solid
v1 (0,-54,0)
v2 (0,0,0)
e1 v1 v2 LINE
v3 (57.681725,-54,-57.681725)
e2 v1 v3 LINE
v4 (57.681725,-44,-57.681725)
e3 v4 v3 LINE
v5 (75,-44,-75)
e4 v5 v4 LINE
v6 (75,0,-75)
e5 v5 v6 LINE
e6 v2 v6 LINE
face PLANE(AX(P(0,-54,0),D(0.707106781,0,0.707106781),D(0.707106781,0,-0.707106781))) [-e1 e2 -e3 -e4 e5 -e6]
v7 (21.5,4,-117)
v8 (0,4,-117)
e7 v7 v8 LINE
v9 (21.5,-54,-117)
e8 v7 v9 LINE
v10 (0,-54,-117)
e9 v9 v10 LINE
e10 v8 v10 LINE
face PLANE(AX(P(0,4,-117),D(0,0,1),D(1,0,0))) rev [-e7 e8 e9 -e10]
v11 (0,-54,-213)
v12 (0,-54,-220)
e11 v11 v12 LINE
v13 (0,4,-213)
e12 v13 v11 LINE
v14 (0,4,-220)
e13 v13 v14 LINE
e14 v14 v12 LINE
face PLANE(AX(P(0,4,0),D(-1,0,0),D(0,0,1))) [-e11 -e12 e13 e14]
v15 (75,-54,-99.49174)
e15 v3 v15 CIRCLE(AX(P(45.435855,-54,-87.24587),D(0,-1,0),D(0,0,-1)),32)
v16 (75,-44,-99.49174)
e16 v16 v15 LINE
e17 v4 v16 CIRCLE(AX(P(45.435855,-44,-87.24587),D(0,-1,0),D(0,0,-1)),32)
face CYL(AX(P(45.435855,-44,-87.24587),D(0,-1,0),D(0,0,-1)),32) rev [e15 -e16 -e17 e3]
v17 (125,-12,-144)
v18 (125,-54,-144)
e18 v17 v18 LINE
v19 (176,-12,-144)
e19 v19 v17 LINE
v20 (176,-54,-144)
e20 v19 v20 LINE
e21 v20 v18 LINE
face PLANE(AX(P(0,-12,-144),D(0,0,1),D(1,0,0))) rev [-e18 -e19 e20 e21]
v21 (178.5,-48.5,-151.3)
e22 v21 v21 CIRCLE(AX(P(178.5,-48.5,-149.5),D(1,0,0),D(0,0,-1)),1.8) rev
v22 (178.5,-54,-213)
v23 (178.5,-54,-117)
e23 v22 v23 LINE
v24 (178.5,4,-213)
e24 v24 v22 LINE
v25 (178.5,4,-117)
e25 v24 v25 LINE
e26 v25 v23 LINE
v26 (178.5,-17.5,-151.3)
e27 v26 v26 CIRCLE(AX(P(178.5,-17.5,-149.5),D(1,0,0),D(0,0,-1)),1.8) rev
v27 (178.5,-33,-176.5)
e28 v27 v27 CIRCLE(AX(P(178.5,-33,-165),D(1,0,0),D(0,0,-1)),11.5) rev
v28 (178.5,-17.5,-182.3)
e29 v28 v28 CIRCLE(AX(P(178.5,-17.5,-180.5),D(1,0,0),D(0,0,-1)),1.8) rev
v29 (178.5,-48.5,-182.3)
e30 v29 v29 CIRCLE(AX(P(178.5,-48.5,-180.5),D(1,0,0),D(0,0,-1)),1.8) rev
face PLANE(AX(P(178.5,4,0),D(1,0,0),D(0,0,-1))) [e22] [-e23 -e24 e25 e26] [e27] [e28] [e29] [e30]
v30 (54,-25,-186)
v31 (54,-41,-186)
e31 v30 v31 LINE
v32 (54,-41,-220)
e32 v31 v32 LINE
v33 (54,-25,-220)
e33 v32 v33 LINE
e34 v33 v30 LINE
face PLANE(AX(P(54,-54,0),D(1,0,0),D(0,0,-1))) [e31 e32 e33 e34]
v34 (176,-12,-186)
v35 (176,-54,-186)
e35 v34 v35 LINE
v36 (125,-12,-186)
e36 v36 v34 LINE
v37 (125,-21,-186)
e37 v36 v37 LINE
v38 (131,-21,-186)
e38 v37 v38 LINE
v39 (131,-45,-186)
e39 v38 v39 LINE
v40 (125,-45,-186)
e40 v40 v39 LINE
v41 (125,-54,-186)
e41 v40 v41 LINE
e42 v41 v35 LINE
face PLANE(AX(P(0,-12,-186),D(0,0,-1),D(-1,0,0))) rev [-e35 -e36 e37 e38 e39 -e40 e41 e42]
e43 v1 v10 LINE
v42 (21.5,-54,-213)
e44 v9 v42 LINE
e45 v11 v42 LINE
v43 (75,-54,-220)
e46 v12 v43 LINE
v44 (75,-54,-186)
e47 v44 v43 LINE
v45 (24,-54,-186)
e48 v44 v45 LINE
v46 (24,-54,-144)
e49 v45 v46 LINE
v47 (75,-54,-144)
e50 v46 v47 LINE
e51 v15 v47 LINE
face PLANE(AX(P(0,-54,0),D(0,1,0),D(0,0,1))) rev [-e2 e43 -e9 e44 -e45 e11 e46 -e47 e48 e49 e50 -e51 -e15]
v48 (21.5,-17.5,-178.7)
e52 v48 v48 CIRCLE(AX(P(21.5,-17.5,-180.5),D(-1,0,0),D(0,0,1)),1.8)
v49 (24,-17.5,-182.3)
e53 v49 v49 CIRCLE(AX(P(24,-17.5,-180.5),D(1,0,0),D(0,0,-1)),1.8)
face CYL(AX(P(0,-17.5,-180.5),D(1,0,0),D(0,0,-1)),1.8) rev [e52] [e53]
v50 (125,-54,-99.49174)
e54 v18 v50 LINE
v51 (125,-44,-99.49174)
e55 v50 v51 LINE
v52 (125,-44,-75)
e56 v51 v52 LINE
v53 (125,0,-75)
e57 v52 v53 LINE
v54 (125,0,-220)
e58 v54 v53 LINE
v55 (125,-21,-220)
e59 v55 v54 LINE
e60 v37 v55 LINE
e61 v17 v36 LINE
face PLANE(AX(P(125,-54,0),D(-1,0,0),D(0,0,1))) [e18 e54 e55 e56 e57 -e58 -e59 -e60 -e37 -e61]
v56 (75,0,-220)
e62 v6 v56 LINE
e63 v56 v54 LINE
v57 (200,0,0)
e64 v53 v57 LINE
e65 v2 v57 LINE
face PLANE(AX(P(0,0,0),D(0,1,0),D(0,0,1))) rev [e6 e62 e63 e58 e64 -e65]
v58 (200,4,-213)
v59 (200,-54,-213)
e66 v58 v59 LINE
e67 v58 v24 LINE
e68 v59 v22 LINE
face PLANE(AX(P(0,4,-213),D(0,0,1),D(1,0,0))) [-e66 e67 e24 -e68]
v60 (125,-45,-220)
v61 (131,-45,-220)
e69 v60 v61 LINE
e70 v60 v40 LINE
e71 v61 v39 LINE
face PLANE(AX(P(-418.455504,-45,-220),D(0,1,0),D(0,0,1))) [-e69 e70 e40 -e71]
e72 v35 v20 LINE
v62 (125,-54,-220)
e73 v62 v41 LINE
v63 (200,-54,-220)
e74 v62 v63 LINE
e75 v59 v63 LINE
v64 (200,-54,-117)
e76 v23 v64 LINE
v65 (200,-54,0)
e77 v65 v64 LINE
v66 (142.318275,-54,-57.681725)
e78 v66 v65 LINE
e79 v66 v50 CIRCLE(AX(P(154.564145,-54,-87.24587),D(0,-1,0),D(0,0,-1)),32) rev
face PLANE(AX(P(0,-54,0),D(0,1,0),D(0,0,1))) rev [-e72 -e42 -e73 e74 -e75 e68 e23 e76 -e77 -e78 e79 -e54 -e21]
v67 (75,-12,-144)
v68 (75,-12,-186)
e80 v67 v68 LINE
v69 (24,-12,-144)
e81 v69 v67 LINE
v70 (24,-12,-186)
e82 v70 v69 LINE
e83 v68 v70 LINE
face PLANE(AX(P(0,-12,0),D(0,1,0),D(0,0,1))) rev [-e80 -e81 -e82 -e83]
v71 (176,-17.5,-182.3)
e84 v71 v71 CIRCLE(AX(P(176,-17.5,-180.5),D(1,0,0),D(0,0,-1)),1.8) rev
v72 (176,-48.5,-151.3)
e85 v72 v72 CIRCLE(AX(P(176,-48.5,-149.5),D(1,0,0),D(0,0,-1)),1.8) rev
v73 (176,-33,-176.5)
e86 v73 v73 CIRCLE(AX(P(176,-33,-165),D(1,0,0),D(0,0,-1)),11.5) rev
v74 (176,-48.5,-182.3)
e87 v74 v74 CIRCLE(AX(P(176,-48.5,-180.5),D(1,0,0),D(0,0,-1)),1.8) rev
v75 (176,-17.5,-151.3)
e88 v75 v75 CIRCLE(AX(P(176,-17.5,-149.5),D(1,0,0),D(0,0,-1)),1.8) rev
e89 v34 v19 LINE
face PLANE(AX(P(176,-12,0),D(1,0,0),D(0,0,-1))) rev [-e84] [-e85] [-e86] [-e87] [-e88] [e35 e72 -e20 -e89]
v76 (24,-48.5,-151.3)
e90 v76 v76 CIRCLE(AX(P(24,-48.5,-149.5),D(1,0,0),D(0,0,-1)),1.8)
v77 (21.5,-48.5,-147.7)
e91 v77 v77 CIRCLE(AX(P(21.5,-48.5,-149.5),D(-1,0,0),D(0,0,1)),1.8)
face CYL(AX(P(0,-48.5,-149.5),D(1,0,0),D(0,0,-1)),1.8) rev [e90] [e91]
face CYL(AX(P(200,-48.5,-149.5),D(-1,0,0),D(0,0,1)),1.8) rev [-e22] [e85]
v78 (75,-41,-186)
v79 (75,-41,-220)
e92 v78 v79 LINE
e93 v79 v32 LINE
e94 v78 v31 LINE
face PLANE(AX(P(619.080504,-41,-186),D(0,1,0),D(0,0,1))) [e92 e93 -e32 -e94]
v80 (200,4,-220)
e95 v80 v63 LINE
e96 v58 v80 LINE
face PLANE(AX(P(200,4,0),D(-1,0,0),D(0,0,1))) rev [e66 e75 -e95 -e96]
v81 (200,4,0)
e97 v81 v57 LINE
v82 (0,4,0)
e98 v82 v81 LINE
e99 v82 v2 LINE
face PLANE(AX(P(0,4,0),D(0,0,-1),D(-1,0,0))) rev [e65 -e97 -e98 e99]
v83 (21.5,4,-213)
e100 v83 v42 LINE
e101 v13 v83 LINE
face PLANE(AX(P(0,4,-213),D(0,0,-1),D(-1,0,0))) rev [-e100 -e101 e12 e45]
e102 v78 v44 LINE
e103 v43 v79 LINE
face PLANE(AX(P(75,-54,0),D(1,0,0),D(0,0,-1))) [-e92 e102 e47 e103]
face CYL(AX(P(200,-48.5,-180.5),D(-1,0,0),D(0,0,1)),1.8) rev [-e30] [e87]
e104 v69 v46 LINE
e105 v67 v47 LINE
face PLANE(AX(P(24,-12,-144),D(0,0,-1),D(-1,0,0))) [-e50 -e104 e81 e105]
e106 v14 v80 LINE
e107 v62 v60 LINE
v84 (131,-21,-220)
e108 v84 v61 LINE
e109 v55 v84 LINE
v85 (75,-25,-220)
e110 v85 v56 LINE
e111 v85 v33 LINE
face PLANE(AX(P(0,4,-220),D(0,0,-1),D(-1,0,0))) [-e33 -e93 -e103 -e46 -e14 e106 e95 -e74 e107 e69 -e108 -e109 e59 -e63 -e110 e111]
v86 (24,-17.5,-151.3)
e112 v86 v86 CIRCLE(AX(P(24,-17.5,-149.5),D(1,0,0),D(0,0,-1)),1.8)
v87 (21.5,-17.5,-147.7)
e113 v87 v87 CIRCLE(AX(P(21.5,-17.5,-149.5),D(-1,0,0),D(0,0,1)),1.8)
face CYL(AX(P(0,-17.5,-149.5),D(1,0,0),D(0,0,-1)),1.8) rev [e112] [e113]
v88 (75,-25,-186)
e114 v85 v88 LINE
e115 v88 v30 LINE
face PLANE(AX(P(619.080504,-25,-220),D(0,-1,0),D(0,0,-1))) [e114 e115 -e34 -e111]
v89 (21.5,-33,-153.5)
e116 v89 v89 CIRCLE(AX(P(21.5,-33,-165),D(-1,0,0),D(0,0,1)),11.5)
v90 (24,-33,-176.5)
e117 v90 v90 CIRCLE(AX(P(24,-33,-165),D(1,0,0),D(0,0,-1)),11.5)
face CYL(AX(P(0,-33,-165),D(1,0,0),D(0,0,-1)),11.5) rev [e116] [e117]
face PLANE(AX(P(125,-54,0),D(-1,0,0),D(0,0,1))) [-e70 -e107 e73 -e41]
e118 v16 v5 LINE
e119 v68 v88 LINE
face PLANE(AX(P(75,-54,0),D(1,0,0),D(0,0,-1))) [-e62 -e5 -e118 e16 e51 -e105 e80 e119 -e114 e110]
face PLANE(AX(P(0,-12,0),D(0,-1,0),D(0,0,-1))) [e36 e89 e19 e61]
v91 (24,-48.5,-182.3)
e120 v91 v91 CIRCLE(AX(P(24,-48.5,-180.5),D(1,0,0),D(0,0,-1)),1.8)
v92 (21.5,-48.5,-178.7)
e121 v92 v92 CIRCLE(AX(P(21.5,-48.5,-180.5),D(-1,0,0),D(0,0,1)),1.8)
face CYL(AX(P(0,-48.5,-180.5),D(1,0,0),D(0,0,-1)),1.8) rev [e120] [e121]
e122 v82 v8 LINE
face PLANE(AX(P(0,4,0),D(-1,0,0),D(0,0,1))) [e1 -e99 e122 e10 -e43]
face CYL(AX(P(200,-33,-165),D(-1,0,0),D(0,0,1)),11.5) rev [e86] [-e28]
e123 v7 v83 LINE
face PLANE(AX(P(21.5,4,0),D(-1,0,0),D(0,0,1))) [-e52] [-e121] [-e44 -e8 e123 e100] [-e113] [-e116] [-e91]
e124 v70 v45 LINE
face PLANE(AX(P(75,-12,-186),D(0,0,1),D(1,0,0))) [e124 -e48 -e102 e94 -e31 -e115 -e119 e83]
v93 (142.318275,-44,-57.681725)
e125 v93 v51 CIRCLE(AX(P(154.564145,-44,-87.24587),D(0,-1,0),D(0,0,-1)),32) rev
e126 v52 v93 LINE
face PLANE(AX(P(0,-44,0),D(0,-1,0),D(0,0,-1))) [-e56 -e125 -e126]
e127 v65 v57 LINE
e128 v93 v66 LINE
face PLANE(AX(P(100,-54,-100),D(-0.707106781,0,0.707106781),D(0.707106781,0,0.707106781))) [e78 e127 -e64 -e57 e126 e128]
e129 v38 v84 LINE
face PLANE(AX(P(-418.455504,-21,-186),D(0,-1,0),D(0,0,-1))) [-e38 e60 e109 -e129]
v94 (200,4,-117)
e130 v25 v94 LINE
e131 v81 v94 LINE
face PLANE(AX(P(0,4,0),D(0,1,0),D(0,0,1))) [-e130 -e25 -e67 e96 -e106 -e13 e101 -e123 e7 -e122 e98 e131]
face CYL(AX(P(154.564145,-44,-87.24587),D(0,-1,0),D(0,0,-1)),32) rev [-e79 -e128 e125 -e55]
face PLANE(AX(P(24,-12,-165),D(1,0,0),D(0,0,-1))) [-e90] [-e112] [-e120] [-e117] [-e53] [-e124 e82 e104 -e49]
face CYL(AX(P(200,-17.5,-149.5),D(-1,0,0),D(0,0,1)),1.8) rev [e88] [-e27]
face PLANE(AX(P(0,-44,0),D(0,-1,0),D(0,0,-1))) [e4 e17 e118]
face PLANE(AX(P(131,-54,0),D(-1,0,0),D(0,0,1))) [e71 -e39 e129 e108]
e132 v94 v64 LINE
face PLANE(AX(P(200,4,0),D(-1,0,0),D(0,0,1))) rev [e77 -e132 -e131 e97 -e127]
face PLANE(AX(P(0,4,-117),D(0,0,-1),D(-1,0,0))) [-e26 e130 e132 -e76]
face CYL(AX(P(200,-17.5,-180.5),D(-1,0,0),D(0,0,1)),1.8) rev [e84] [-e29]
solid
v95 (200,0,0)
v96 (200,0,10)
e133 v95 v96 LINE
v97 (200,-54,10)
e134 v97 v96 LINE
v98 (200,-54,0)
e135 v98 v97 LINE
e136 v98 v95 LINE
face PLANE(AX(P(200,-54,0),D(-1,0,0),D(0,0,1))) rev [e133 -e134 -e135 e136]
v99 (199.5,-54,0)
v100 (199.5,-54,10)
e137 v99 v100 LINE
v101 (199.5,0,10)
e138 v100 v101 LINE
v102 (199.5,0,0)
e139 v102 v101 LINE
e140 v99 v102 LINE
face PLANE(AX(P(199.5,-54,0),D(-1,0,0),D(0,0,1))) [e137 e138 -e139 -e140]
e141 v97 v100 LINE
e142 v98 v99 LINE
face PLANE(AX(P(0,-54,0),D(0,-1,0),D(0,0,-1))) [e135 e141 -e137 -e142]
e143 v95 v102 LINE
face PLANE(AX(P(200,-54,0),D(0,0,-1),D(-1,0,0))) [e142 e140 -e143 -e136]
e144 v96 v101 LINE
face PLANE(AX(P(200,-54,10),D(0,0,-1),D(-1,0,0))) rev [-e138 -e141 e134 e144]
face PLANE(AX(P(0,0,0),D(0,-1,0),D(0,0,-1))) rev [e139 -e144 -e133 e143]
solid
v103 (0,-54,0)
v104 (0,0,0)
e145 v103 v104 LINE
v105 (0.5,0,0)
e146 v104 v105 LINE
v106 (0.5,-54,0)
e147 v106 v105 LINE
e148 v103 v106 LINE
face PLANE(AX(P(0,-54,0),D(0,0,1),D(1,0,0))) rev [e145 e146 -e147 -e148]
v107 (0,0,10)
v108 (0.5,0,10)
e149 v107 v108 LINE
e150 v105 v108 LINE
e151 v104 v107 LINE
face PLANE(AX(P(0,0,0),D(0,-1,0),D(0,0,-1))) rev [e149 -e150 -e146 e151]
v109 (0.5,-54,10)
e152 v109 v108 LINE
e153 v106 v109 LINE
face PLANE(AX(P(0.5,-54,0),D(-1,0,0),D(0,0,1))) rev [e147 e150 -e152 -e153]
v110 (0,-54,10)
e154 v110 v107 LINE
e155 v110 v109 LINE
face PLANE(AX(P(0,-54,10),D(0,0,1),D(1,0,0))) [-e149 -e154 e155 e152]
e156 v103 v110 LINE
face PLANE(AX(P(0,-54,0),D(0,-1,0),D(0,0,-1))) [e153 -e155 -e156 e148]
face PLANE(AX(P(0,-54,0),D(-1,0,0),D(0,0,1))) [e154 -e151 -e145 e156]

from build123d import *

# Parameters (mm, degrees)
SKETCH_1_W              = 200
SKETCH_1_H              = 220
EXTRUDE_1_DEPTH         = 4
EXTRUDE_2_DEPTH         = 54
SKETCH_1_5_W            = 0.5
SKETCH_1_5_H            = 10
EXTRUDE_3_DEPTH         = 54
EXTRUDE_3_2_DEPTH       = 54
CUT_EXTRUDE_2_DEPTH     = 303.925733473
CUT_EXTRUDE_3_DEPTH     = 42
SKETCH_7_R              = 1.8
SKETCH_7_R_2            = 11.5
CUT_EXTRUDE_4_DEPTH     = 287.865822293
MIRROR_START            = 176
MIRROR_1_OUTLINE_R      = 1.8
MIRROR_1_OUTLINE_R_2    = 11.5
MIRROR_1_DEPTH          = 2.5
CUT_EXTRUDE_START       = -21
CUT_EXTRUDE_5_OUTLINE_W = 34
CUT_EXTRUDE_5_OUTLINE_H = 16
CUT_EXTRUDE_5_DEPTH     = 21
CUT_EXTRUDE_START_2     = -6
CUT_EXTRUDE_6_OUTLINE_W = 34
CUT_EXTRUDE_6_OUTLINE_H = 24
CUT_EXTRUDE_6_DEPTH     = 6
SKETCH_11_R             = 32
CUT_EXTRUDE_7_DEPTH     = 10


# Read off the part's stored shape, not the designer's step: 镜向1, 切除-拉伸5, 切除-拉伸6
with BuildPart() as part:
    # 草图1 → 凸台-拉伸1 (new body)
    with BuildSketch(Plane(origin=(0, 0, 0), x_dir=(1, 0, 0), z_dir=(0, 1, 0))):
        with Locations((100, 110)):
            Rectangle(SKETCH_1_W, SKETCH_1_H)
    extrude(amount=EXTRUDE_1_DEPTH)

    # 草图1<4> → 凸台-拉伸2 (add)
    with BuildSketch(Plane(origin=(0, 0, 0), x_dir=(1, 0, 0), z_dir=(0, 1, 0))):
        Polygon((0, 220), (0, 0), (75, 75), (75, 220), align=None)
        Polygon((125, 220), (125, 75), (200, 0), (200, 220), align=None)
    extrude(amount=-EXTRUDE_2_DEPTH)

    # 草图3 → 切除-拉伸2 (cut, through all)
    with BuildSketch(Plane.XZ.offset(54)):
        Polygon((21.5, -186), (21.5, -165), (21.5, -144), (21.5, -117), (0, -117), (0, -213), (21.5, -213), align=None)
        Polygon((178.5, -117), (200, -117), (200, -213), (178.5, -213), (178.5, -165), align=None)
    extrude(amount=-CUT_EXTRUDE_2_DEPTH, mode=Mode.SUBTRACT)

    # 草图5 → 切除-拉伸3 (cut)
    with BuildSketch(Plane.XZ.offset(54)):
        Polygon((176, -165), (176, -144), (125, -144), (125, -186), (176, -186), align=None)
        Polygon((24, -165), (24, -144), (75, -144), (75, -186), (24, -186), align=None)
    extrude(amount=-CUT_EXTRUDE_3_DEPTH, mode=Mode.SUBTRACT)

    # 草图7 → 切除-拉伸4 (cut, through all)
    with BuildSketch(Plane(origin=(24, 0, 0), x_dir=(0, 0, -1), z_dir=(1, 0, 0))):
        with Locations((180.5, -17.5)):
            Circle(SKETCH_7_R)
        with Locations((149.5, -17.5)):
            Circle(SKETCH_7_R)
        with Locations((165, -33)):
            Circle(SKETCH_7_R_2)
        with Locations((180.5, -48.5)):
            Circle(SKETCH_7_R)
        with Locations((149.5, -48.5)):
            Circle(SKETCH_7_R)
    extrude(amount=-CUT_EXTRUDE_4_DEPTH, mode=Mode.SUBTRACT)

    # 镜向1 outline → 镜向1 (cut)
    with BuildSketch(Plane.YZ.offset(MIRROR_START)):
        with Locations((-17.5, -180.5)):
            Circle(MIRROR_1_OUTLINE_R)
        with Locations((-17.5, -149.5)):
            Circle(MIRROR_1_OUTLINE_R)
        with Locations((-33, -165)):
            Circle(MIRROR_1_OUTLINE_R_2)
        with Locations((-48.5, -180.5)):
            Circle(MIRROR_1_OUTLINE_R)
        with Locations((-48.5, -149.5)):
            Circle(MIRROR_1_OUTLINE_R)
    extrude(amount=MIRROR_1_DEPTH, mode=Mode.SUBTRACT)

    # 切除-拉伸5 outline → 切除-拉伸5 (cut)
    with BuildSketch(Plane(origin=(75, 0, 0), x_dir=(0, 0, -1), z_dir=(1, 0, 0)).offset(CUT_EXTRUDE_START)):
        with Locations((203, -33)):
            Rectangle(CUT_EXTRUDE_5_OUTLINE_W, CUT_EXTRUDE_5_OUTLINE_H)
    extrude(amount=CUT_EXTRUDE_5_DEPTH, mode=Mode.SUBTRACT)

    # 切除-拉伸6 outline → 切除-拉伸6 (cut)
    with BuildSketch(Plane.ZY.offset(-125).offset(CUT_EXTRUDE_START_2)):
        with Locations((-203, -33)):
            Rectangle(CUT_EXTRUDE_6_OUTLINE_W, CUT_EXTRUDE_6_OUTLINE_H)
    extrude(amount=CUT_EXTRUDE_6_DEPTH, mode=Mode.SUBTRACT)

    # 草图11 → 切除-拉伸7 (cut)
    with BuildSketch(Plane.XZ.offset(54)):
        with BuildLine():
            Line((75, -75), (57.681724795, -57.681724795))
            ThreePointArc((57.681724795, -57.681724795), (15.871709919, -99.491739671), (75, -99.491739671))
            Line((75, -99.491739671), (75, -75))
        make_face()
        with Locations((154.56414504, -87.245869836)):
            Circle(SKETCH_11_R)
    extrude(amount=-CUT_EXTRUDE_7_DEPTH, mode=Mode.SUBTRACT)


with BuildPart() as body_2:
    # 草图1<5> → 凸台-拉伸3 (new body)
    with BuildSketch(Plane(origin=(0, 0, 0), x_dir=(1, 0, 0), z_dir=(0, 1, 0))):
        with Locations((199.75, -5)):
            Rectangle(SKETCH_1_5_W, SKETCH_1_5_H)
    extrude(amount=-EXTRUDE_3_DEPTH)


with BuildPart() as body_3:
    # 草图1<5> → Extrude 3 2 (new body)
    with BuildSketch(Plane(origin=(0, 0, 0), x_dir=(1, 0, 0), z_dir=(0, 1, 0))):
        with Locations((0.25, -5)):
            Rectangle(SKETCH_1_5_W, SKETCH_1_5_H)
    extrude(amount=-EXTRUDE_3_2_DEPTH)


solid = Compound([part.part, body_2.part, body_3.part])
